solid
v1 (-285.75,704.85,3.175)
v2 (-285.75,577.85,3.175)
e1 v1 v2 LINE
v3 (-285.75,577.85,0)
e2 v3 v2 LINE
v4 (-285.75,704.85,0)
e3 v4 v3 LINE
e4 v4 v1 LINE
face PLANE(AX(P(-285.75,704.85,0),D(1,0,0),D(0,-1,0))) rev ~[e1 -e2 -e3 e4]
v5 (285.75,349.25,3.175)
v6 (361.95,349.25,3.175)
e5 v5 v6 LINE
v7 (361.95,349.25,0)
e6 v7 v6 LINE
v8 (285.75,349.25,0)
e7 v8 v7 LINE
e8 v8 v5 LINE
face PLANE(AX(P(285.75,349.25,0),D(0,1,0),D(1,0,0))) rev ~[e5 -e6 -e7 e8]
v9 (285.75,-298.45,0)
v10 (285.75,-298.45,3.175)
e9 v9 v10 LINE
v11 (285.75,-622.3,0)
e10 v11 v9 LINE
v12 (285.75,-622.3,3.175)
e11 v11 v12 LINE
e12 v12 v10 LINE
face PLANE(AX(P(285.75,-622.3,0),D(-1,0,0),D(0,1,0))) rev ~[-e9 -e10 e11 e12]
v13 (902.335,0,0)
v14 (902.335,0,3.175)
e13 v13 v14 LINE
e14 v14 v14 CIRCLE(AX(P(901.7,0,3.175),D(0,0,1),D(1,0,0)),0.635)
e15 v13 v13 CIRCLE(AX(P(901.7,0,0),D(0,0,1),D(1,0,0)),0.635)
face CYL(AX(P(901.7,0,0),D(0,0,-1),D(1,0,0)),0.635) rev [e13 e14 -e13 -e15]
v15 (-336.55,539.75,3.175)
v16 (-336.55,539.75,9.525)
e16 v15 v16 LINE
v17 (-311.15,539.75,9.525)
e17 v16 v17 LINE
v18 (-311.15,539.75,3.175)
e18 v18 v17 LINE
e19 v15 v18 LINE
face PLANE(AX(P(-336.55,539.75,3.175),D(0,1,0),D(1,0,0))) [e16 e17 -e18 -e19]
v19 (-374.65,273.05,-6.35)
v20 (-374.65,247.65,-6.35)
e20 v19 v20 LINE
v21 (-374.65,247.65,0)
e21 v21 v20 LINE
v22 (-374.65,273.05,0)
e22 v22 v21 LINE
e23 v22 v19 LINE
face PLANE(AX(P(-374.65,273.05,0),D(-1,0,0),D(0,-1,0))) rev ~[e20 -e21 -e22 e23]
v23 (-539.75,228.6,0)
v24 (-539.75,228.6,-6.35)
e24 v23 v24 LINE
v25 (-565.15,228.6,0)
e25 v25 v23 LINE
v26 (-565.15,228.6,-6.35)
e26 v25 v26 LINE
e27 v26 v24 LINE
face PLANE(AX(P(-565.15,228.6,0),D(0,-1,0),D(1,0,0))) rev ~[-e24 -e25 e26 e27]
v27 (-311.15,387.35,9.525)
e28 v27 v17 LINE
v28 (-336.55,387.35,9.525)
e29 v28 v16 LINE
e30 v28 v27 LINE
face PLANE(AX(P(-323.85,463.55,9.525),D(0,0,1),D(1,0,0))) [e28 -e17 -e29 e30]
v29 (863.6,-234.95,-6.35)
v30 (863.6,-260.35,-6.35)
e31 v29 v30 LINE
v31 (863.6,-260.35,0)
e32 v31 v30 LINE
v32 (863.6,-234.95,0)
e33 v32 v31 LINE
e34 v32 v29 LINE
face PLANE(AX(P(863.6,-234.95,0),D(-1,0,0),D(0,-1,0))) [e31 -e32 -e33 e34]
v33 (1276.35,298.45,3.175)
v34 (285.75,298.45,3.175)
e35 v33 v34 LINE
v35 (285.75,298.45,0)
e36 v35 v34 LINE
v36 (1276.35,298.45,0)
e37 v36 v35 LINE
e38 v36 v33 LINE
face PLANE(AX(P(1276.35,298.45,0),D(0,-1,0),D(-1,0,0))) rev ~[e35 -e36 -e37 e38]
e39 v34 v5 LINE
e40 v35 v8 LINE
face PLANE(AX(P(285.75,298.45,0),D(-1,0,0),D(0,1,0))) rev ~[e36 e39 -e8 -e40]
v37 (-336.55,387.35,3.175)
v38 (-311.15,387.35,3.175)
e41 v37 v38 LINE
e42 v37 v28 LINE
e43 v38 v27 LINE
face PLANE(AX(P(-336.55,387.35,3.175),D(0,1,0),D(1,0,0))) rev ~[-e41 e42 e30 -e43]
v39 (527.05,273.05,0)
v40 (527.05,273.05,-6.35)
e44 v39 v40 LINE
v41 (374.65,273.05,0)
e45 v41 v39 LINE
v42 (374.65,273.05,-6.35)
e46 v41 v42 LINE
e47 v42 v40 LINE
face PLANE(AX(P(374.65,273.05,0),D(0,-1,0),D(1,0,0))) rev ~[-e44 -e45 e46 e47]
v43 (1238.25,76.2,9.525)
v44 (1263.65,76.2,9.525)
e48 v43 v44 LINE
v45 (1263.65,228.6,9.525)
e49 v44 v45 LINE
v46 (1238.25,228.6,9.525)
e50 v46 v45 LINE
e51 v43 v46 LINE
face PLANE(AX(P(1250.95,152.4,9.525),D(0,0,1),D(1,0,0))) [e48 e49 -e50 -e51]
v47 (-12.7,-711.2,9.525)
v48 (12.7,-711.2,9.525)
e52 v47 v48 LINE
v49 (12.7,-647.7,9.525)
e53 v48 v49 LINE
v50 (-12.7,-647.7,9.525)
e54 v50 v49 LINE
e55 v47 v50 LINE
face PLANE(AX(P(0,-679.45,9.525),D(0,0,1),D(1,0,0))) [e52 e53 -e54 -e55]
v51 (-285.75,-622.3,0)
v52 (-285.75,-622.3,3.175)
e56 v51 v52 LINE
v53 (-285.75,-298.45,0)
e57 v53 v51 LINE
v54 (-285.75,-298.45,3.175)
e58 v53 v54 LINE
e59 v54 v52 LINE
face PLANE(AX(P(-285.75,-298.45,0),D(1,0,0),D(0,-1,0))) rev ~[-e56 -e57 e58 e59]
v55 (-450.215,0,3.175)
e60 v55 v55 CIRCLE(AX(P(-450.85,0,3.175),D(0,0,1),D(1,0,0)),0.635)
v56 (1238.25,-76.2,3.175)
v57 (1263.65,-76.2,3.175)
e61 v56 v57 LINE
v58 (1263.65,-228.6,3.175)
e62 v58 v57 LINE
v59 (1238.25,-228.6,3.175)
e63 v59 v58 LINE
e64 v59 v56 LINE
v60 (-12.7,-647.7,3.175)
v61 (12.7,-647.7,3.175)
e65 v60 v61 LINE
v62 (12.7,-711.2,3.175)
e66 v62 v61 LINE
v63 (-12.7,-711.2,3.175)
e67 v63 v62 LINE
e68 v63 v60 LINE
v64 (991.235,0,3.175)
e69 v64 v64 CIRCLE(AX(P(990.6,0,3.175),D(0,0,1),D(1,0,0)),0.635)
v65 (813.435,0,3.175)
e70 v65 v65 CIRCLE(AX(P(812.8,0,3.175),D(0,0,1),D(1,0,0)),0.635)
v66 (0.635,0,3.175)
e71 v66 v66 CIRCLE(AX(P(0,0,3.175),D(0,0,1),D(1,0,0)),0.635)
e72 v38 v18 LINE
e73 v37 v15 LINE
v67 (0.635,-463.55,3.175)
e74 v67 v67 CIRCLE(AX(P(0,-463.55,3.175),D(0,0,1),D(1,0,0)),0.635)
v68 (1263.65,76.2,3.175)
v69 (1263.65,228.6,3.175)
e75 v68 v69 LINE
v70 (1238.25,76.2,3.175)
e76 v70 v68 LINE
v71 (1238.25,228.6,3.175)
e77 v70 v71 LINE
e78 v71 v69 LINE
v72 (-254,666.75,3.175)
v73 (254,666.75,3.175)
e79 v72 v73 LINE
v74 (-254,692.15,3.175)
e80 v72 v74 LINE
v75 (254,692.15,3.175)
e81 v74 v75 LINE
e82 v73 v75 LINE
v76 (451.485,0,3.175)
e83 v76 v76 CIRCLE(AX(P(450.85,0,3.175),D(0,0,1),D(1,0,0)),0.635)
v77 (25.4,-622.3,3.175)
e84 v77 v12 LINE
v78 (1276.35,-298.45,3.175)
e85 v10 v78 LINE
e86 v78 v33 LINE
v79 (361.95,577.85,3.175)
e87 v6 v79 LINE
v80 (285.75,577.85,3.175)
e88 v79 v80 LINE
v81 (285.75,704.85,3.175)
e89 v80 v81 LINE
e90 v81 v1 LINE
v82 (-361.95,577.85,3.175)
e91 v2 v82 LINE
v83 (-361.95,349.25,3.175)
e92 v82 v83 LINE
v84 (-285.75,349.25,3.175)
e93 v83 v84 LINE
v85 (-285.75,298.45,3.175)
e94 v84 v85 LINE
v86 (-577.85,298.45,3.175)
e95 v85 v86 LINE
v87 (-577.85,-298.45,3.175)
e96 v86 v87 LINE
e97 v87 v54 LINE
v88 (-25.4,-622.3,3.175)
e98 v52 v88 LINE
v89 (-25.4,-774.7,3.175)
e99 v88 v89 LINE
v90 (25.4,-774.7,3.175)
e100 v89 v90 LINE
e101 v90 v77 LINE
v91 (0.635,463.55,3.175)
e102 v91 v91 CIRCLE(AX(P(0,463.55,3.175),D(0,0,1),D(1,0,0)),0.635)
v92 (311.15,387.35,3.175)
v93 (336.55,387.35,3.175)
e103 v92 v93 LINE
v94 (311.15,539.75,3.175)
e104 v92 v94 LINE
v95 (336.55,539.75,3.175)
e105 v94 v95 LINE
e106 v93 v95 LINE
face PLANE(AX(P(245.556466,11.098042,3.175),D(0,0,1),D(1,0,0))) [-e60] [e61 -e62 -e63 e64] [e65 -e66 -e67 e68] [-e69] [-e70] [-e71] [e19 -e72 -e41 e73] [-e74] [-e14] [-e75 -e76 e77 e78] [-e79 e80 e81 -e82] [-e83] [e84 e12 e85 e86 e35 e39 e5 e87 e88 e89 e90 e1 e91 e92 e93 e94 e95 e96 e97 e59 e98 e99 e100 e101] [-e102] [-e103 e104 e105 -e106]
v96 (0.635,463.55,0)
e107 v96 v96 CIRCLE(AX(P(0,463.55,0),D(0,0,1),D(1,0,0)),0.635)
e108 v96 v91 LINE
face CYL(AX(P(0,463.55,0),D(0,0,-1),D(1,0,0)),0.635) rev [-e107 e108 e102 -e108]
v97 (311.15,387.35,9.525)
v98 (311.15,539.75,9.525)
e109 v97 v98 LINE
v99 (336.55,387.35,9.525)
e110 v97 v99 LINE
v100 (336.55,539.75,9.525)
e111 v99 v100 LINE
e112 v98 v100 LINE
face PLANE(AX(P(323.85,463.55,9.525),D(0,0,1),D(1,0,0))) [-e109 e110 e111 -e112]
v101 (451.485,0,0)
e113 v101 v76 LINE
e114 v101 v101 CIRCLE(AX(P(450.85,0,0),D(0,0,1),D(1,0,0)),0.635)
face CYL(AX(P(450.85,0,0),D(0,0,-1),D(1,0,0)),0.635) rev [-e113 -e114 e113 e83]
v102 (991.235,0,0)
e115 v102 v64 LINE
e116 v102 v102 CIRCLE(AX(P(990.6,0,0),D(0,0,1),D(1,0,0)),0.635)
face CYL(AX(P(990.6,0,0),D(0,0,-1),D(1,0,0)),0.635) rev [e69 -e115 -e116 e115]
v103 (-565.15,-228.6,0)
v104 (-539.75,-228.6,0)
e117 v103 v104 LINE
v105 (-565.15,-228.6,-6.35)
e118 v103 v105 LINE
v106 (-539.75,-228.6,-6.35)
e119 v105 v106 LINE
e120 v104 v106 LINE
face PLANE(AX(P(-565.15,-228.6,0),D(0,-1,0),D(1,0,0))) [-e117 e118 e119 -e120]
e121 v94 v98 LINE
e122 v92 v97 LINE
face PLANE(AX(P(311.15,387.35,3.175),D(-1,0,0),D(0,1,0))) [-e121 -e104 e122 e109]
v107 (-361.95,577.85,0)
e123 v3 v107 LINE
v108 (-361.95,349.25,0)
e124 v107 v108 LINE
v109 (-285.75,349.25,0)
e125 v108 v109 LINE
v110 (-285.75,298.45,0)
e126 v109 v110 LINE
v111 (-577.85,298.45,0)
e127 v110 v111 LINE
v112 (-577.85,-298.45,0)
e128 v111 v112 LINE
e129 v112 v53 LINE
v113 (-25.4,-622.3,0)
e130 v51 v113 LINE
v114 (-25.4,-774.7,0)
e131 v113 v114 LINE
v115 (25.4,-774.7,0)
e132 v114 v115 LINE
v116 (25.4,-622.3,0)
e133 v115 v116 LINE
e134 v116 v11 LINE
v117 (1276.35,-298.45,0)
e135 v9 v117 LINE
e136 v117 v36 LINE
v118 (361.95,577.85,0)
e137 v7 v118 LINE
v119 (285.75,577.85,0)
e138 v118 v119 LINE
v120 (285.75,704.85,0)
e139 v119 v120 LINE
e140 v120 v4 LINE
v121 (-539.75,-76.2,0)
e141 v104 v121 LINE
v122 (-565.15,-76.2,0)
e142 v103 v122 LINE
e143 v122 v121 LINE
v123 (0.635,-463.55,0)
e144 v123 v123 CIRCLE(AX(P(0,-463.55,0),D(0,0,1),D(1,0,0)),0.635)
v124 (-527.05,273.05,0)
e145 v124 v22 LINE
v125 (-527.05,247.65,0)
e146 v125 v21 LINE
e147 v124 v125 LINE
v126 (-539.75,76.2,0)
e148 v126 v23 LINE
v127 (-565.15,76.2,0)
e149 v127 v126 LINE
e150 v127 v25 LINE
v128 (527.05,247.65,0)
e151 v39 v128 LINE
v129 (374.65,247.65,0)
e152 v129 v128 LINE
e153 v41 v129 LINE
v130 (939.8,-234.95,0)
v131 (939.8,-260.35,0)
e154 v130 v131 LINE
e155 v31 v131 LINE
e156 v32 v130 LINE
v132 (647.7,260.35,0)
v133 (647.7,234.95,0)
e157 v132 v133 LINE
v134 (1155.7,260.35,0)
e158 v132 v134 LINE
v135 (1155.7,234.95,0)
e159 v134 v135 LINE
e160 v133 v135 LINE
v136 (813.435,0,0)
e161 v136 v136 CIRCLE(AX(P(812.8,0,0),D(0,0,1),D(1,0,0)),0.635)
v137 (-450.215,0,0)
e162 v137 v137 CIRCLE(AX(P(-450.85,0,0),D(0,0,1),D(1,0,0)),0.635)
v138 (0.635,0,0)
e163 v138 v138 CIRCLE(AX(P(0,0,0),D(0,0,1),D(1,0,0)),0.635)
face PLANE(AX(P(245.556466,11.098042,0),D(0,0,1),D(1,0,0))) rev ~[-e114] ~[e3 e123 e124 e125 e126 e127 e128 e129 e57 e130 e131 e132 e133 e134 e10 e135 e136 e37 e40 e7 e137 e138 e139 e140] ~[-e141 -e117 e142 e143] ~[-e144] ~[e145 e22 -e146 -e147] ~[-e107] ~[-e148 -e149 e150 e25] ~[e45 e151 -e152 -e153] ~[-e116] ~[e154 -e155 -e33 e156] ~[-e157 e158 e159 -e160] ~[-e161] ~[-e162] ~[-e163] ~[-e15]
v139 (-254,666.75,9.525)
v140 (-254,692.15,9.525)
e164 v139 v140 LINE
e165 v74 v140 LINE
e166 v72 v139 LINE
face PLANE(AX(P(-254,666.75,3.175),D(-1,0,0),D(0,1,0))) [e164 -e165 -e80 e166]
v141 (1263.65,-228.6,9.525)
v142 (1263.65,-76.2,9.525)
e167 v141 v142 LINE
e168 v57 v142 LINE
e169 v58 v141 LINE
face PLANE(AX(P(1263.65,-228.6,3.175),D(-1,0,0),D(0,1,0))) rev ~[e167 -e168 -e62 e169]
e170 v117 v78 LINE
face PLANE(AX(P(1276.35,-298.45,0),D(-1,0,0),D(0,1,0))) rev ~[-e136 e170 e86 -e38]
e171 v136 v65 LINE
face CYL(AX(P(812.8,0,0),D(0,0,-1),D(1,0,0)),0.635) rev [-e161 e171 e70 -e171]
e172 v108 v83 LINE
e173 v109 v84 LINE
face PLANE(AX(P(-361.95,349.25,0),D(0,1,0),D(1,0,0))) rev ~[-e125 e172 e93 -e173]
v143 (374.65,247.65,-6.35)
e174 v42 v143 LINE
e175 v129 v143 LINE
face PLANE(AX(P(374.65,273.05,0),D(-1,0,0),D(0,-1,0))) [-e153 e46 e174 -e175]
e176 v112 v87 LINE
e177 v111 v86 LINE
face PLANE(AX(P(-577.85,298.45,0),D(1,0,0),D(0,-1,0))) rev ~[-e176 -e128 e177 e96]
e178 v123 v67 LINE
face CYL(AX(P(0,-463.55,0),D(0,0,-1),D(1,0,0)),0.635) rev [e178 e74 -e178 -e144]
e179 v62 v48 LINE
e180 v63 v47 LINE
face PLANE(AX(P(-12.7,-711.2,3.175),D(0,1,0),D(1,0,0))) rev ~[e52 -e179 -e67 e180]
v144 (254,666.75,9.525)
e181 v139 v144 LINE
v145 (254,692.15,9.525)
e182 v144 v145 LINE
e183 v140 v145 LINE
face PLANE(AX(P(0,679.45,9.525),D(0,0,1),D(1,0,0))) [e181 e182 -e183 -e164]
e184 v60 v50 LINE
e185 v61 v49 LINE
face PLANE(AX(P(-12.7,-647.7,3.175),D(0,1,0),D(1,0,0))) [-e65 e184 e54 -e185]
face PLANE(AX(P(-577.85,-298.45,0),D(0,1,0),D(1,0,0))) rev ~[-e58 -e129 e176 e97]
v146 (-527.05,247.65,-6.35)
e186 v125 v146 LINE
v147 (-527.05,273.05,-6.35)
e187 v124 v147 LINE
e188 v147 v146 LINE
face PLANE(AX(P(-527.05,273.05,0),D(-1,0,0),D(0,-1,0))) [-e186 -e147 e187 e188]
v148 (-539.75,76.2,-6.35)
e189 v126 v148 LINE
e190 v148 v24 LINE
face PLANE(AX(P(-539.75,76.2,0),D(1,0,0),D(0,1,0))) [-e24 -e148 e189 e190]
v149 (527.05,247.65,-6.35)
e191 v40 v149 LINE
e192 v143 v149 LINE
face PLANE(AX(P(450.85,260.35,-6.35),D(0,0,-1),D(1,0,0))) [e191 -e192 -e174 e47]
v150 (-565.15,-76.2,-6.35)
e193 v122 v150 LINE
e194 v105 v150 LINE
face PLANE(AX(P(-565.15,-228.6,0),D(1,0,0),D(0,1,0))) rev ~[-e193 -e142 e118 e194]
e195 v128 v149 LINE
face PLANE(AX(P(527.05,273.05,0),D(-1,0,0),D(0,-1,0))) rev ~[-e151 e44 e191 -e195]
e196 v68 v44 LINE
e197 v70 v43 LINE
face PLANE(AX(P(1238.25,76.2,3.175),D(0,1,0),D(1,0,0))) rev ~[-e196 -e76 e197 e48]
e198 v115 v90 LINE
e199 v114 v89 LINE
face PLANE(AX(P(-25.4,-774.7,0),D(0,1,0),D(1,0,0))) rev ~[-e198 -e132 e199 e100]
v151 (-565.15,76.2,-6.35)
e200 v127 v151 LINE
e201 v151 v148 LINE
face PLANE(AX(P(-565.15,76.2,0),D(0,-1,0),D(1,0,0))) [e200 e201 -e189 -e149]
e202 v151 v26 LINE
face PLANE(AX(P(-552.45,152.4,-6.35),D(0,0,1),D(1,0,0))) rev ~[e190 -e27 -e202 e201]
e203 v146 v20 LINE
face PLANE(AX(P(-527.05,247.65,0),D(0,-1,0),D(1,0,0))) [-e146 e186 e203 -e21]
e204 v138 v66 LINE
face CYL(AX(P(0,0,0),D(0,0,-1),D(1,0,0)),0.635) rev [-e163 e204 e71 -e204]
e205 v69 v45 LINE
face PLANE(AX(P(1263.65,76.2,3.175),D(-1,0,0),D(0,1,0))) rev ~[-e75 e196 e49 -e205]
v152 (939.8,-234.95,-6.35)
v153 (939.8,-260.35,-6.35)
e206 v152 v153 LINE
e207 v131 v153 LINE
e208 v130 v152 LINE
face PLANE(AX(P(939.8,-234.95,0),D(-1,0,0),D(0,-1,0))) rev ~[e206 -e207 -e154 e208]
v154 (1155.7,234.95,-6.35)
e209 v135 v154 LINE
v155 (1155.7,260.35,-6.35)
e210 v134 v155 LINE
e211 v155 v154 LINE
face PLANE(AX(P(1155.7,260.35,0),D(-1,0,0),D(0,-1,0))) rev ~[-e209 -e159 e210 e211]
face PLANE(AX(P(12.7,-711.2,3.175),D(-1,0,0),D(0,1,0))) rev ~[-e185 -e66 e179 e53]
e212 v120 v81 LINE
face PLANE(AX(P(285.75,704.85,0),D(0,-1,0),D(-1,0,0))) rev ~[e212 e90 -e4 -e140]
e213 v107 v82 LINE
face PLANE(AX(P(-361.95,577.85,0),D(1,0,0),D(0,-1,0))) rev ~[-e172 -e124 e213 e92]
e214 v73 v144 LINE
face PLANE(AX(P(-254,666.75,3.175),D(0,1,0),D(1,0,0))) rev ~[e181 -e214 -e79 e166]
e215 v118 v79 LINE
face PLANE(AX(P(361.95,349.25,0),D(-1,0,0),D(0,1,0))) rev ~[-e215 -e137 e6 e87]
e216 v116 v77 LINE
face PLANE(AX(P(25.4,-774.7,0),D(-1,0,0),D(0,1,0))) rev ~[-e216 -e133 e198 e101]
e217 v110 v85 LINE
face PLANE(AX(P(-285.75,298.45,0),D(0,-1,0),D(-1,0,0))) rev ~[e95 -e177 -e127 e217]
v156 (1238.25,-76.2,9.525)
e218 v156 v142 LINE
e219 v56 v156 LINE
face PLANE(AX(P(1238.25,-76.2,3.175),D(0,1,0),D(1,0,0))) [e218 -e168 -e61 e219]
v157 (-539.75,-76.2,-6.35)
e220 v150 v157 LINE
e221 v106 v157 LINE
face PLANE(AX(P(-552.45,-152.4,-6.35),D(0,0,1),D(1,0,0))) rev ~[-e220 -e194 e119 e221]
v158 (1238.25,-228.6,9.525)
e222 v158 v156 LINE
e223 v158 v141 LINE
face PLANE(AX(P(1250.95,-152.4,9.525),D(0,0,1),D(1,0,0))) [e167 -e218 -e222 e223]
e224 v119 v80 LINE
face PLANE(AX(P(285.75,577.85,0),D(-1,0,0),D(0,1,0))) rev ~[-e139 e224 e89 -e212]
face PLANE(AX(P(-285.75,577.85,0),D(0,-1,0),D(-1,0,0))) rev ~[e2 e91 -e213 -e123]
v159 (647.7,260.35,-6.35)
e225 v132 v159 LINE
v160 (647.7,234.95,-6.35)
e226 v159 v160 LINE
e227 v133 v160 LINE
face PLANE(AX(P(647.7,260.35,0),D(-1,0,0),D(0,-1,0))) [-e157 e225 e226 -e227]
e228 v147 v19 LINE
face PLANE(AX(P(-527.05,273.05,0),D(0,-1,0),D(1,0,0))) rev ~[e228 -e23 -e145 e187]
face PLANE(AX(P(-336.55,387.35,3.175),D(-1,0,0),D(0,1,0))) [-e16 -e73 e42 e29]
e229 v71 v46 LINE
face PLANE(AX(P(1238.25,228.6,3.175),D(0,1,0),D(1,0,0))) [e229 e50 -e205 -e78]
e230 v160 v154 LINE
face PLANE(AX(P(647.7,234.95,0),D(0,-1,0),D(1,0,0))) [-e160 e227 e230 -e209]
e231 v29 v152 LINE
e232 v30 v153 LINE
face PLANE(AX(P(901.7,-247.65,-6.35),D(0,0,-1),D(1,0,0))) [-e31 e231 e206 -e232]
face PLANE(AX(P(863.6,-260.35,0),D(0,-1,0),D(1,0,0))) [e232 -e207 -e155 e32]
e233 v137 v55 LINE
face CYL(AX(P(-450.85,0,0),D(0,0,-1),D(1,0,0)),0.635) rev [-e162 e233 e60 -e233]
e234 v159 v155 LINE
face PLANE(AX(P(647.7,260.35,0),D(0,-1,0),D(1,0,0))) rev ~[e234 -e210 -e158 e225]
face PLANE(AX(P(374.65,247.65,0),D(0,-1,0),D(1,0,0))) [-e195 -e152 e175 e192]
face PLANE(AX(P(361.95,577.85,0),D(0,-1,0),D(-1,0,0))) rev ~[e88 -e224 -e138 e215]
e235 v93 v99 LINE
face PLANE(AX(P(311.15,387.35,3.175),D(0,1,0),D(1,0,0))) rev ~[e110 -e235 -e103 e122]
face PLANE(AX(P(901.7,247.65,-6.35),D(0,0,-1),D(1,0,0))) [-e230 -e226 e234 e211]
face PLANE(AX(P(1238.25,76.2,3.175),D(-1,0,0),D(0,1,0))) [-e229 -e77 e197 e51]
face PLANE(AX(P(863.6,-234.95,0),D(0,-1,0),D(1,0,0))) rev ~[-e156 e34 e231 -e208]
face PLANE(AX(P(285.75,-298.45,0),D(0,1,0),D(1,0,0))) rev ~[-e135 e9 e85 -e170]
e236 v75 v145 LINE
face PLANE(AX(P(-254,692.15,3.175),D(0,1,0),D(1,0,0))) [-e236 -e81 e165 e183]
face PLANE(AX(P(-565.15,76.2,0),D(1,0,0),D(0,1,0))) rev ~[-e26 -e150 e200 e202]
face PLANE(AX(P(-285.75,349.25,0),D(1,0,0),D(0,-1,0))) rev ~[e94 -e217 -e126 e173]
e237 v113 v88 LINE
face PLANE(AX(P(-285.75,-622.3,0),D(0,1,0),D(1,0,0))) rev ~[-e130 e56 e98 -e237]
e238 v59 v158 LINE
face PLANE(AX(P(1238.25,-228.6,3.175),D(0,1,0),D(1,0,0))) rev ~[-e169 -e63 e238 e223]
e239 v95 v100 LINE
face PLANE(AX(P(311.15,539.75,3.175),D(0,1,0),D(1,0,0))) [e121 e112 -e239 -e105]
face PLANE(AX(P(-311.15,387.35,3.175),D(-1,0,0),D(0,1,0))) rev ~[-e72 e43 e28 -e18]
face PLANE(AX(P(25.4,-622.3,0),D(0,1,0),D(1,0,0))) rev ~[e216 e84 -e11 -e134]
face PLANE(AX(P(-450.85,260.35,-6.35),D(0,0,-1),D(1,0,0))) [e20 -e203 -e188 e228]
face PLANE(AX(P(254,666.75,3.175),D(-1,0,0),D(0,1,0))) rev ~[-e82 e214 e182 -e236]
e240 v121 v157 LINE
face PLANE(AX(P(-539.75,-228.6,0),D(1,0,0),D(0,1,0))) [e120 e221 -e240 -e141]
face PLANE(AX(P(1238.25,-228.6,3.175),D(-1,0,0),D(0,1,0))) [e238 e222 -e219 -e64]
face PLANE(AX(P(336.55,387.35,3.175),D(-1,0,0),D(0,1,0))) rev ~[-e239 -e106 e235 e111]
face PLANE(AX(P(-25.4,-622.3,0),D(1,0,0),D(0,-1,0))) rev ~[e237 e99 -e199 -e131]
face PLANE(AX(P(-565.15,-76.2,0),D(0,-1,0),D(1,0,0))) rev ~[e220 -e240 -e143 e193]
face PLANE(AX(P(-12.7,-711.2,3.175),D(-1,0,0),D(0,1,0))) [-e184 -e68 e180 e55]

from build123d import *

# Parameters (mm, degrees)
F0_R      = 0.635
F1_DEPTH  = 3.175
F2_W      = 508
F2_H      = 25.4
F3_DEPTH  = 6.35
F4_W      = 25.4
F4_H      = 63.5
F4_H_2    = 152.4
F5_DEPTH  = 6.35
F6_W      = 508
F6_H      = 25.4
F7_DEPTH  = 6.35
F8_W      = 152.4
F8_H      = 25.4
F9_DEPTH  = 6.35
F10_W     = 25.4
F10_H     = 152.4
F11_DEPTH = 6.35
F12_W     = 25.4
F12_H     = 152.4
F13_DEPTH = 6.35
F14_W     = 76.2
F14_H     = 25.4
F15_DEPTH = 6.35


# Not quite as in the source:
# - a feature of the source that left no trace in its solid (it failed there, or was rolled back) is left out


with BuildPart() as f1:
    # F0 (on Top) → F1 (new body)
    with BuildSketch(Plane.XY):
        Polygon((285.75, -298.45), (323.85, -298.45), (577.85, -298.45), (615.95, -298.45), (1187.45, -298.45), (1276.35, -298.45), (1276.35, 298.45), (1187.45, 298.45), (285.75, 298.45), (285.75, 349.25), (361.95, 349.25), (361.95, 577.85), (285.75, 577.85), (285.75, 704.85), (-285.75, 704.85), (-285.75, 577.85), (-361.95, 577.85), (-361.95, 349.25), (-285.75, 349.25), (-285.75, 336.55), (-285.75, 298.45), (-323.85, 298.45), (-361.95, 298.45), (-577.85, 298.45), (-577.85, -298.45), (-323.85, -298.45), (-285.75, -298.45), (-285.75, -336.55), (-285.75, -622.3), (-25.4, -622.3), (-25.4, -774.7), (25.4, -774.7), (25.4, -622.3), (177.8, -622.3), (285.75, -622.3), (285.75, -336.55), align=None)
        with Locations((0, -463.55)):
            Circle(F0_R, mode=Mode.SUBTRACT)
        with Locations((-450.85, 0)):
            Circle(F0_R, mode=Mode.SUBTRACT)
        Circle(F0_R, mode=Mode.SUBTRACT)
        with Locations((0, 463.55)):
            Circle(F0_R, mode=Mode.SUBTRACT)
        with Locations((450.85, 0)):
            Circle(F0_R, mode=Mode.SUBTRACT)
        with Locations((812.8, 0)):
            Circle(F0_R, mode=Mode.SUBTRACT)
        with Locations((901.7, 0)):
            Circle(F0_R, mode=Mode.SUBTRACT)
        with Locations((990.6, 0)):
            Circle(F0_R, mode=Mode.SUBTRACT)
    extrude(amount=F1_DEPTH)

    # F2 (on face) → F3 (join)
    with BuildSketch(Plane.XY.offset(3.175)):
        with Locations((0, 679.45)):
            Rectangle(F2_W, F2_H)
    extrude(amount=F3_DEPTH)

    # F4 (on face) → F5 (join)
    with BuildSketch(Plane.XY.offset(3.175)):
        with Locations((0, -679.45)):
            Rectangle(F4_W, F4_H)
        with Locations((-323.85, 463.55)):
            Rectangle(F4_W, F4_H_2)
        with Locations((323.85, 463.55)):
            Rectangle(F4_W, F4_H_2)
    extrude(amount=F5_DEPTH)

    # F6 (on face) → F7 (join)
    with BuildSketch(Plane(origin=(0, 0, 0), x_dir=(1, 0, 0), z_dir=(0, 0, -1))):
        with Locations((901.7, -247.65)):
            Rectangle(F6_W, F6_H)
    extrude(amount=F7_DEPTH)

    # F8 (on face) → F9 (join)
    with BuildSketch(Plane(origin=(0, 0, 0), x_dir=(1, 0, 0), z_dir=(0, 0, -1))):
        with Locations((450.85, -260.35)):
            Rectangle(F8_W, F8_H)
        with Locations((-450.85, -260.35)):
            Rectangle(F8_W, F8_H)
    extrude(amount=F9_DEPTH)

    # F10 (on face) → F11 (join)
    with BuildSketch(Plane.XY.offset(3.175)):
        with Locations((1250.95, 152.4)):
            Rectangle(F10_W, F10_H)
        with Locations((1250.95, -152.4)):
            Rectangle(F10_W, F10_H)
    extrude(amount=F11_DEPTH)

    # F12 (on face) → F13 (join)
    with BuildSketch(Plane.XY):
        with Locations((-552.45, 152.4)):
            Rectangle(F12_W, F12_H)
        with Locations((-552.45, -152.4)):
            Rectangle(F12_W, F12_H)
    extrude(amount=-F13_DEPTH)

    # F14 (on face) → F15 (join)
    with BuildSketch(Plane(origin=(0, 0, 0), x_dir=(1, 0, 0), z_dir=(0, 0, -1))):
        with Locations((901.7, 247.65)):
            Rectangle(F14_W, F14_H)
    extrude(amount=F15_DEPTH)


solid = f1.part
